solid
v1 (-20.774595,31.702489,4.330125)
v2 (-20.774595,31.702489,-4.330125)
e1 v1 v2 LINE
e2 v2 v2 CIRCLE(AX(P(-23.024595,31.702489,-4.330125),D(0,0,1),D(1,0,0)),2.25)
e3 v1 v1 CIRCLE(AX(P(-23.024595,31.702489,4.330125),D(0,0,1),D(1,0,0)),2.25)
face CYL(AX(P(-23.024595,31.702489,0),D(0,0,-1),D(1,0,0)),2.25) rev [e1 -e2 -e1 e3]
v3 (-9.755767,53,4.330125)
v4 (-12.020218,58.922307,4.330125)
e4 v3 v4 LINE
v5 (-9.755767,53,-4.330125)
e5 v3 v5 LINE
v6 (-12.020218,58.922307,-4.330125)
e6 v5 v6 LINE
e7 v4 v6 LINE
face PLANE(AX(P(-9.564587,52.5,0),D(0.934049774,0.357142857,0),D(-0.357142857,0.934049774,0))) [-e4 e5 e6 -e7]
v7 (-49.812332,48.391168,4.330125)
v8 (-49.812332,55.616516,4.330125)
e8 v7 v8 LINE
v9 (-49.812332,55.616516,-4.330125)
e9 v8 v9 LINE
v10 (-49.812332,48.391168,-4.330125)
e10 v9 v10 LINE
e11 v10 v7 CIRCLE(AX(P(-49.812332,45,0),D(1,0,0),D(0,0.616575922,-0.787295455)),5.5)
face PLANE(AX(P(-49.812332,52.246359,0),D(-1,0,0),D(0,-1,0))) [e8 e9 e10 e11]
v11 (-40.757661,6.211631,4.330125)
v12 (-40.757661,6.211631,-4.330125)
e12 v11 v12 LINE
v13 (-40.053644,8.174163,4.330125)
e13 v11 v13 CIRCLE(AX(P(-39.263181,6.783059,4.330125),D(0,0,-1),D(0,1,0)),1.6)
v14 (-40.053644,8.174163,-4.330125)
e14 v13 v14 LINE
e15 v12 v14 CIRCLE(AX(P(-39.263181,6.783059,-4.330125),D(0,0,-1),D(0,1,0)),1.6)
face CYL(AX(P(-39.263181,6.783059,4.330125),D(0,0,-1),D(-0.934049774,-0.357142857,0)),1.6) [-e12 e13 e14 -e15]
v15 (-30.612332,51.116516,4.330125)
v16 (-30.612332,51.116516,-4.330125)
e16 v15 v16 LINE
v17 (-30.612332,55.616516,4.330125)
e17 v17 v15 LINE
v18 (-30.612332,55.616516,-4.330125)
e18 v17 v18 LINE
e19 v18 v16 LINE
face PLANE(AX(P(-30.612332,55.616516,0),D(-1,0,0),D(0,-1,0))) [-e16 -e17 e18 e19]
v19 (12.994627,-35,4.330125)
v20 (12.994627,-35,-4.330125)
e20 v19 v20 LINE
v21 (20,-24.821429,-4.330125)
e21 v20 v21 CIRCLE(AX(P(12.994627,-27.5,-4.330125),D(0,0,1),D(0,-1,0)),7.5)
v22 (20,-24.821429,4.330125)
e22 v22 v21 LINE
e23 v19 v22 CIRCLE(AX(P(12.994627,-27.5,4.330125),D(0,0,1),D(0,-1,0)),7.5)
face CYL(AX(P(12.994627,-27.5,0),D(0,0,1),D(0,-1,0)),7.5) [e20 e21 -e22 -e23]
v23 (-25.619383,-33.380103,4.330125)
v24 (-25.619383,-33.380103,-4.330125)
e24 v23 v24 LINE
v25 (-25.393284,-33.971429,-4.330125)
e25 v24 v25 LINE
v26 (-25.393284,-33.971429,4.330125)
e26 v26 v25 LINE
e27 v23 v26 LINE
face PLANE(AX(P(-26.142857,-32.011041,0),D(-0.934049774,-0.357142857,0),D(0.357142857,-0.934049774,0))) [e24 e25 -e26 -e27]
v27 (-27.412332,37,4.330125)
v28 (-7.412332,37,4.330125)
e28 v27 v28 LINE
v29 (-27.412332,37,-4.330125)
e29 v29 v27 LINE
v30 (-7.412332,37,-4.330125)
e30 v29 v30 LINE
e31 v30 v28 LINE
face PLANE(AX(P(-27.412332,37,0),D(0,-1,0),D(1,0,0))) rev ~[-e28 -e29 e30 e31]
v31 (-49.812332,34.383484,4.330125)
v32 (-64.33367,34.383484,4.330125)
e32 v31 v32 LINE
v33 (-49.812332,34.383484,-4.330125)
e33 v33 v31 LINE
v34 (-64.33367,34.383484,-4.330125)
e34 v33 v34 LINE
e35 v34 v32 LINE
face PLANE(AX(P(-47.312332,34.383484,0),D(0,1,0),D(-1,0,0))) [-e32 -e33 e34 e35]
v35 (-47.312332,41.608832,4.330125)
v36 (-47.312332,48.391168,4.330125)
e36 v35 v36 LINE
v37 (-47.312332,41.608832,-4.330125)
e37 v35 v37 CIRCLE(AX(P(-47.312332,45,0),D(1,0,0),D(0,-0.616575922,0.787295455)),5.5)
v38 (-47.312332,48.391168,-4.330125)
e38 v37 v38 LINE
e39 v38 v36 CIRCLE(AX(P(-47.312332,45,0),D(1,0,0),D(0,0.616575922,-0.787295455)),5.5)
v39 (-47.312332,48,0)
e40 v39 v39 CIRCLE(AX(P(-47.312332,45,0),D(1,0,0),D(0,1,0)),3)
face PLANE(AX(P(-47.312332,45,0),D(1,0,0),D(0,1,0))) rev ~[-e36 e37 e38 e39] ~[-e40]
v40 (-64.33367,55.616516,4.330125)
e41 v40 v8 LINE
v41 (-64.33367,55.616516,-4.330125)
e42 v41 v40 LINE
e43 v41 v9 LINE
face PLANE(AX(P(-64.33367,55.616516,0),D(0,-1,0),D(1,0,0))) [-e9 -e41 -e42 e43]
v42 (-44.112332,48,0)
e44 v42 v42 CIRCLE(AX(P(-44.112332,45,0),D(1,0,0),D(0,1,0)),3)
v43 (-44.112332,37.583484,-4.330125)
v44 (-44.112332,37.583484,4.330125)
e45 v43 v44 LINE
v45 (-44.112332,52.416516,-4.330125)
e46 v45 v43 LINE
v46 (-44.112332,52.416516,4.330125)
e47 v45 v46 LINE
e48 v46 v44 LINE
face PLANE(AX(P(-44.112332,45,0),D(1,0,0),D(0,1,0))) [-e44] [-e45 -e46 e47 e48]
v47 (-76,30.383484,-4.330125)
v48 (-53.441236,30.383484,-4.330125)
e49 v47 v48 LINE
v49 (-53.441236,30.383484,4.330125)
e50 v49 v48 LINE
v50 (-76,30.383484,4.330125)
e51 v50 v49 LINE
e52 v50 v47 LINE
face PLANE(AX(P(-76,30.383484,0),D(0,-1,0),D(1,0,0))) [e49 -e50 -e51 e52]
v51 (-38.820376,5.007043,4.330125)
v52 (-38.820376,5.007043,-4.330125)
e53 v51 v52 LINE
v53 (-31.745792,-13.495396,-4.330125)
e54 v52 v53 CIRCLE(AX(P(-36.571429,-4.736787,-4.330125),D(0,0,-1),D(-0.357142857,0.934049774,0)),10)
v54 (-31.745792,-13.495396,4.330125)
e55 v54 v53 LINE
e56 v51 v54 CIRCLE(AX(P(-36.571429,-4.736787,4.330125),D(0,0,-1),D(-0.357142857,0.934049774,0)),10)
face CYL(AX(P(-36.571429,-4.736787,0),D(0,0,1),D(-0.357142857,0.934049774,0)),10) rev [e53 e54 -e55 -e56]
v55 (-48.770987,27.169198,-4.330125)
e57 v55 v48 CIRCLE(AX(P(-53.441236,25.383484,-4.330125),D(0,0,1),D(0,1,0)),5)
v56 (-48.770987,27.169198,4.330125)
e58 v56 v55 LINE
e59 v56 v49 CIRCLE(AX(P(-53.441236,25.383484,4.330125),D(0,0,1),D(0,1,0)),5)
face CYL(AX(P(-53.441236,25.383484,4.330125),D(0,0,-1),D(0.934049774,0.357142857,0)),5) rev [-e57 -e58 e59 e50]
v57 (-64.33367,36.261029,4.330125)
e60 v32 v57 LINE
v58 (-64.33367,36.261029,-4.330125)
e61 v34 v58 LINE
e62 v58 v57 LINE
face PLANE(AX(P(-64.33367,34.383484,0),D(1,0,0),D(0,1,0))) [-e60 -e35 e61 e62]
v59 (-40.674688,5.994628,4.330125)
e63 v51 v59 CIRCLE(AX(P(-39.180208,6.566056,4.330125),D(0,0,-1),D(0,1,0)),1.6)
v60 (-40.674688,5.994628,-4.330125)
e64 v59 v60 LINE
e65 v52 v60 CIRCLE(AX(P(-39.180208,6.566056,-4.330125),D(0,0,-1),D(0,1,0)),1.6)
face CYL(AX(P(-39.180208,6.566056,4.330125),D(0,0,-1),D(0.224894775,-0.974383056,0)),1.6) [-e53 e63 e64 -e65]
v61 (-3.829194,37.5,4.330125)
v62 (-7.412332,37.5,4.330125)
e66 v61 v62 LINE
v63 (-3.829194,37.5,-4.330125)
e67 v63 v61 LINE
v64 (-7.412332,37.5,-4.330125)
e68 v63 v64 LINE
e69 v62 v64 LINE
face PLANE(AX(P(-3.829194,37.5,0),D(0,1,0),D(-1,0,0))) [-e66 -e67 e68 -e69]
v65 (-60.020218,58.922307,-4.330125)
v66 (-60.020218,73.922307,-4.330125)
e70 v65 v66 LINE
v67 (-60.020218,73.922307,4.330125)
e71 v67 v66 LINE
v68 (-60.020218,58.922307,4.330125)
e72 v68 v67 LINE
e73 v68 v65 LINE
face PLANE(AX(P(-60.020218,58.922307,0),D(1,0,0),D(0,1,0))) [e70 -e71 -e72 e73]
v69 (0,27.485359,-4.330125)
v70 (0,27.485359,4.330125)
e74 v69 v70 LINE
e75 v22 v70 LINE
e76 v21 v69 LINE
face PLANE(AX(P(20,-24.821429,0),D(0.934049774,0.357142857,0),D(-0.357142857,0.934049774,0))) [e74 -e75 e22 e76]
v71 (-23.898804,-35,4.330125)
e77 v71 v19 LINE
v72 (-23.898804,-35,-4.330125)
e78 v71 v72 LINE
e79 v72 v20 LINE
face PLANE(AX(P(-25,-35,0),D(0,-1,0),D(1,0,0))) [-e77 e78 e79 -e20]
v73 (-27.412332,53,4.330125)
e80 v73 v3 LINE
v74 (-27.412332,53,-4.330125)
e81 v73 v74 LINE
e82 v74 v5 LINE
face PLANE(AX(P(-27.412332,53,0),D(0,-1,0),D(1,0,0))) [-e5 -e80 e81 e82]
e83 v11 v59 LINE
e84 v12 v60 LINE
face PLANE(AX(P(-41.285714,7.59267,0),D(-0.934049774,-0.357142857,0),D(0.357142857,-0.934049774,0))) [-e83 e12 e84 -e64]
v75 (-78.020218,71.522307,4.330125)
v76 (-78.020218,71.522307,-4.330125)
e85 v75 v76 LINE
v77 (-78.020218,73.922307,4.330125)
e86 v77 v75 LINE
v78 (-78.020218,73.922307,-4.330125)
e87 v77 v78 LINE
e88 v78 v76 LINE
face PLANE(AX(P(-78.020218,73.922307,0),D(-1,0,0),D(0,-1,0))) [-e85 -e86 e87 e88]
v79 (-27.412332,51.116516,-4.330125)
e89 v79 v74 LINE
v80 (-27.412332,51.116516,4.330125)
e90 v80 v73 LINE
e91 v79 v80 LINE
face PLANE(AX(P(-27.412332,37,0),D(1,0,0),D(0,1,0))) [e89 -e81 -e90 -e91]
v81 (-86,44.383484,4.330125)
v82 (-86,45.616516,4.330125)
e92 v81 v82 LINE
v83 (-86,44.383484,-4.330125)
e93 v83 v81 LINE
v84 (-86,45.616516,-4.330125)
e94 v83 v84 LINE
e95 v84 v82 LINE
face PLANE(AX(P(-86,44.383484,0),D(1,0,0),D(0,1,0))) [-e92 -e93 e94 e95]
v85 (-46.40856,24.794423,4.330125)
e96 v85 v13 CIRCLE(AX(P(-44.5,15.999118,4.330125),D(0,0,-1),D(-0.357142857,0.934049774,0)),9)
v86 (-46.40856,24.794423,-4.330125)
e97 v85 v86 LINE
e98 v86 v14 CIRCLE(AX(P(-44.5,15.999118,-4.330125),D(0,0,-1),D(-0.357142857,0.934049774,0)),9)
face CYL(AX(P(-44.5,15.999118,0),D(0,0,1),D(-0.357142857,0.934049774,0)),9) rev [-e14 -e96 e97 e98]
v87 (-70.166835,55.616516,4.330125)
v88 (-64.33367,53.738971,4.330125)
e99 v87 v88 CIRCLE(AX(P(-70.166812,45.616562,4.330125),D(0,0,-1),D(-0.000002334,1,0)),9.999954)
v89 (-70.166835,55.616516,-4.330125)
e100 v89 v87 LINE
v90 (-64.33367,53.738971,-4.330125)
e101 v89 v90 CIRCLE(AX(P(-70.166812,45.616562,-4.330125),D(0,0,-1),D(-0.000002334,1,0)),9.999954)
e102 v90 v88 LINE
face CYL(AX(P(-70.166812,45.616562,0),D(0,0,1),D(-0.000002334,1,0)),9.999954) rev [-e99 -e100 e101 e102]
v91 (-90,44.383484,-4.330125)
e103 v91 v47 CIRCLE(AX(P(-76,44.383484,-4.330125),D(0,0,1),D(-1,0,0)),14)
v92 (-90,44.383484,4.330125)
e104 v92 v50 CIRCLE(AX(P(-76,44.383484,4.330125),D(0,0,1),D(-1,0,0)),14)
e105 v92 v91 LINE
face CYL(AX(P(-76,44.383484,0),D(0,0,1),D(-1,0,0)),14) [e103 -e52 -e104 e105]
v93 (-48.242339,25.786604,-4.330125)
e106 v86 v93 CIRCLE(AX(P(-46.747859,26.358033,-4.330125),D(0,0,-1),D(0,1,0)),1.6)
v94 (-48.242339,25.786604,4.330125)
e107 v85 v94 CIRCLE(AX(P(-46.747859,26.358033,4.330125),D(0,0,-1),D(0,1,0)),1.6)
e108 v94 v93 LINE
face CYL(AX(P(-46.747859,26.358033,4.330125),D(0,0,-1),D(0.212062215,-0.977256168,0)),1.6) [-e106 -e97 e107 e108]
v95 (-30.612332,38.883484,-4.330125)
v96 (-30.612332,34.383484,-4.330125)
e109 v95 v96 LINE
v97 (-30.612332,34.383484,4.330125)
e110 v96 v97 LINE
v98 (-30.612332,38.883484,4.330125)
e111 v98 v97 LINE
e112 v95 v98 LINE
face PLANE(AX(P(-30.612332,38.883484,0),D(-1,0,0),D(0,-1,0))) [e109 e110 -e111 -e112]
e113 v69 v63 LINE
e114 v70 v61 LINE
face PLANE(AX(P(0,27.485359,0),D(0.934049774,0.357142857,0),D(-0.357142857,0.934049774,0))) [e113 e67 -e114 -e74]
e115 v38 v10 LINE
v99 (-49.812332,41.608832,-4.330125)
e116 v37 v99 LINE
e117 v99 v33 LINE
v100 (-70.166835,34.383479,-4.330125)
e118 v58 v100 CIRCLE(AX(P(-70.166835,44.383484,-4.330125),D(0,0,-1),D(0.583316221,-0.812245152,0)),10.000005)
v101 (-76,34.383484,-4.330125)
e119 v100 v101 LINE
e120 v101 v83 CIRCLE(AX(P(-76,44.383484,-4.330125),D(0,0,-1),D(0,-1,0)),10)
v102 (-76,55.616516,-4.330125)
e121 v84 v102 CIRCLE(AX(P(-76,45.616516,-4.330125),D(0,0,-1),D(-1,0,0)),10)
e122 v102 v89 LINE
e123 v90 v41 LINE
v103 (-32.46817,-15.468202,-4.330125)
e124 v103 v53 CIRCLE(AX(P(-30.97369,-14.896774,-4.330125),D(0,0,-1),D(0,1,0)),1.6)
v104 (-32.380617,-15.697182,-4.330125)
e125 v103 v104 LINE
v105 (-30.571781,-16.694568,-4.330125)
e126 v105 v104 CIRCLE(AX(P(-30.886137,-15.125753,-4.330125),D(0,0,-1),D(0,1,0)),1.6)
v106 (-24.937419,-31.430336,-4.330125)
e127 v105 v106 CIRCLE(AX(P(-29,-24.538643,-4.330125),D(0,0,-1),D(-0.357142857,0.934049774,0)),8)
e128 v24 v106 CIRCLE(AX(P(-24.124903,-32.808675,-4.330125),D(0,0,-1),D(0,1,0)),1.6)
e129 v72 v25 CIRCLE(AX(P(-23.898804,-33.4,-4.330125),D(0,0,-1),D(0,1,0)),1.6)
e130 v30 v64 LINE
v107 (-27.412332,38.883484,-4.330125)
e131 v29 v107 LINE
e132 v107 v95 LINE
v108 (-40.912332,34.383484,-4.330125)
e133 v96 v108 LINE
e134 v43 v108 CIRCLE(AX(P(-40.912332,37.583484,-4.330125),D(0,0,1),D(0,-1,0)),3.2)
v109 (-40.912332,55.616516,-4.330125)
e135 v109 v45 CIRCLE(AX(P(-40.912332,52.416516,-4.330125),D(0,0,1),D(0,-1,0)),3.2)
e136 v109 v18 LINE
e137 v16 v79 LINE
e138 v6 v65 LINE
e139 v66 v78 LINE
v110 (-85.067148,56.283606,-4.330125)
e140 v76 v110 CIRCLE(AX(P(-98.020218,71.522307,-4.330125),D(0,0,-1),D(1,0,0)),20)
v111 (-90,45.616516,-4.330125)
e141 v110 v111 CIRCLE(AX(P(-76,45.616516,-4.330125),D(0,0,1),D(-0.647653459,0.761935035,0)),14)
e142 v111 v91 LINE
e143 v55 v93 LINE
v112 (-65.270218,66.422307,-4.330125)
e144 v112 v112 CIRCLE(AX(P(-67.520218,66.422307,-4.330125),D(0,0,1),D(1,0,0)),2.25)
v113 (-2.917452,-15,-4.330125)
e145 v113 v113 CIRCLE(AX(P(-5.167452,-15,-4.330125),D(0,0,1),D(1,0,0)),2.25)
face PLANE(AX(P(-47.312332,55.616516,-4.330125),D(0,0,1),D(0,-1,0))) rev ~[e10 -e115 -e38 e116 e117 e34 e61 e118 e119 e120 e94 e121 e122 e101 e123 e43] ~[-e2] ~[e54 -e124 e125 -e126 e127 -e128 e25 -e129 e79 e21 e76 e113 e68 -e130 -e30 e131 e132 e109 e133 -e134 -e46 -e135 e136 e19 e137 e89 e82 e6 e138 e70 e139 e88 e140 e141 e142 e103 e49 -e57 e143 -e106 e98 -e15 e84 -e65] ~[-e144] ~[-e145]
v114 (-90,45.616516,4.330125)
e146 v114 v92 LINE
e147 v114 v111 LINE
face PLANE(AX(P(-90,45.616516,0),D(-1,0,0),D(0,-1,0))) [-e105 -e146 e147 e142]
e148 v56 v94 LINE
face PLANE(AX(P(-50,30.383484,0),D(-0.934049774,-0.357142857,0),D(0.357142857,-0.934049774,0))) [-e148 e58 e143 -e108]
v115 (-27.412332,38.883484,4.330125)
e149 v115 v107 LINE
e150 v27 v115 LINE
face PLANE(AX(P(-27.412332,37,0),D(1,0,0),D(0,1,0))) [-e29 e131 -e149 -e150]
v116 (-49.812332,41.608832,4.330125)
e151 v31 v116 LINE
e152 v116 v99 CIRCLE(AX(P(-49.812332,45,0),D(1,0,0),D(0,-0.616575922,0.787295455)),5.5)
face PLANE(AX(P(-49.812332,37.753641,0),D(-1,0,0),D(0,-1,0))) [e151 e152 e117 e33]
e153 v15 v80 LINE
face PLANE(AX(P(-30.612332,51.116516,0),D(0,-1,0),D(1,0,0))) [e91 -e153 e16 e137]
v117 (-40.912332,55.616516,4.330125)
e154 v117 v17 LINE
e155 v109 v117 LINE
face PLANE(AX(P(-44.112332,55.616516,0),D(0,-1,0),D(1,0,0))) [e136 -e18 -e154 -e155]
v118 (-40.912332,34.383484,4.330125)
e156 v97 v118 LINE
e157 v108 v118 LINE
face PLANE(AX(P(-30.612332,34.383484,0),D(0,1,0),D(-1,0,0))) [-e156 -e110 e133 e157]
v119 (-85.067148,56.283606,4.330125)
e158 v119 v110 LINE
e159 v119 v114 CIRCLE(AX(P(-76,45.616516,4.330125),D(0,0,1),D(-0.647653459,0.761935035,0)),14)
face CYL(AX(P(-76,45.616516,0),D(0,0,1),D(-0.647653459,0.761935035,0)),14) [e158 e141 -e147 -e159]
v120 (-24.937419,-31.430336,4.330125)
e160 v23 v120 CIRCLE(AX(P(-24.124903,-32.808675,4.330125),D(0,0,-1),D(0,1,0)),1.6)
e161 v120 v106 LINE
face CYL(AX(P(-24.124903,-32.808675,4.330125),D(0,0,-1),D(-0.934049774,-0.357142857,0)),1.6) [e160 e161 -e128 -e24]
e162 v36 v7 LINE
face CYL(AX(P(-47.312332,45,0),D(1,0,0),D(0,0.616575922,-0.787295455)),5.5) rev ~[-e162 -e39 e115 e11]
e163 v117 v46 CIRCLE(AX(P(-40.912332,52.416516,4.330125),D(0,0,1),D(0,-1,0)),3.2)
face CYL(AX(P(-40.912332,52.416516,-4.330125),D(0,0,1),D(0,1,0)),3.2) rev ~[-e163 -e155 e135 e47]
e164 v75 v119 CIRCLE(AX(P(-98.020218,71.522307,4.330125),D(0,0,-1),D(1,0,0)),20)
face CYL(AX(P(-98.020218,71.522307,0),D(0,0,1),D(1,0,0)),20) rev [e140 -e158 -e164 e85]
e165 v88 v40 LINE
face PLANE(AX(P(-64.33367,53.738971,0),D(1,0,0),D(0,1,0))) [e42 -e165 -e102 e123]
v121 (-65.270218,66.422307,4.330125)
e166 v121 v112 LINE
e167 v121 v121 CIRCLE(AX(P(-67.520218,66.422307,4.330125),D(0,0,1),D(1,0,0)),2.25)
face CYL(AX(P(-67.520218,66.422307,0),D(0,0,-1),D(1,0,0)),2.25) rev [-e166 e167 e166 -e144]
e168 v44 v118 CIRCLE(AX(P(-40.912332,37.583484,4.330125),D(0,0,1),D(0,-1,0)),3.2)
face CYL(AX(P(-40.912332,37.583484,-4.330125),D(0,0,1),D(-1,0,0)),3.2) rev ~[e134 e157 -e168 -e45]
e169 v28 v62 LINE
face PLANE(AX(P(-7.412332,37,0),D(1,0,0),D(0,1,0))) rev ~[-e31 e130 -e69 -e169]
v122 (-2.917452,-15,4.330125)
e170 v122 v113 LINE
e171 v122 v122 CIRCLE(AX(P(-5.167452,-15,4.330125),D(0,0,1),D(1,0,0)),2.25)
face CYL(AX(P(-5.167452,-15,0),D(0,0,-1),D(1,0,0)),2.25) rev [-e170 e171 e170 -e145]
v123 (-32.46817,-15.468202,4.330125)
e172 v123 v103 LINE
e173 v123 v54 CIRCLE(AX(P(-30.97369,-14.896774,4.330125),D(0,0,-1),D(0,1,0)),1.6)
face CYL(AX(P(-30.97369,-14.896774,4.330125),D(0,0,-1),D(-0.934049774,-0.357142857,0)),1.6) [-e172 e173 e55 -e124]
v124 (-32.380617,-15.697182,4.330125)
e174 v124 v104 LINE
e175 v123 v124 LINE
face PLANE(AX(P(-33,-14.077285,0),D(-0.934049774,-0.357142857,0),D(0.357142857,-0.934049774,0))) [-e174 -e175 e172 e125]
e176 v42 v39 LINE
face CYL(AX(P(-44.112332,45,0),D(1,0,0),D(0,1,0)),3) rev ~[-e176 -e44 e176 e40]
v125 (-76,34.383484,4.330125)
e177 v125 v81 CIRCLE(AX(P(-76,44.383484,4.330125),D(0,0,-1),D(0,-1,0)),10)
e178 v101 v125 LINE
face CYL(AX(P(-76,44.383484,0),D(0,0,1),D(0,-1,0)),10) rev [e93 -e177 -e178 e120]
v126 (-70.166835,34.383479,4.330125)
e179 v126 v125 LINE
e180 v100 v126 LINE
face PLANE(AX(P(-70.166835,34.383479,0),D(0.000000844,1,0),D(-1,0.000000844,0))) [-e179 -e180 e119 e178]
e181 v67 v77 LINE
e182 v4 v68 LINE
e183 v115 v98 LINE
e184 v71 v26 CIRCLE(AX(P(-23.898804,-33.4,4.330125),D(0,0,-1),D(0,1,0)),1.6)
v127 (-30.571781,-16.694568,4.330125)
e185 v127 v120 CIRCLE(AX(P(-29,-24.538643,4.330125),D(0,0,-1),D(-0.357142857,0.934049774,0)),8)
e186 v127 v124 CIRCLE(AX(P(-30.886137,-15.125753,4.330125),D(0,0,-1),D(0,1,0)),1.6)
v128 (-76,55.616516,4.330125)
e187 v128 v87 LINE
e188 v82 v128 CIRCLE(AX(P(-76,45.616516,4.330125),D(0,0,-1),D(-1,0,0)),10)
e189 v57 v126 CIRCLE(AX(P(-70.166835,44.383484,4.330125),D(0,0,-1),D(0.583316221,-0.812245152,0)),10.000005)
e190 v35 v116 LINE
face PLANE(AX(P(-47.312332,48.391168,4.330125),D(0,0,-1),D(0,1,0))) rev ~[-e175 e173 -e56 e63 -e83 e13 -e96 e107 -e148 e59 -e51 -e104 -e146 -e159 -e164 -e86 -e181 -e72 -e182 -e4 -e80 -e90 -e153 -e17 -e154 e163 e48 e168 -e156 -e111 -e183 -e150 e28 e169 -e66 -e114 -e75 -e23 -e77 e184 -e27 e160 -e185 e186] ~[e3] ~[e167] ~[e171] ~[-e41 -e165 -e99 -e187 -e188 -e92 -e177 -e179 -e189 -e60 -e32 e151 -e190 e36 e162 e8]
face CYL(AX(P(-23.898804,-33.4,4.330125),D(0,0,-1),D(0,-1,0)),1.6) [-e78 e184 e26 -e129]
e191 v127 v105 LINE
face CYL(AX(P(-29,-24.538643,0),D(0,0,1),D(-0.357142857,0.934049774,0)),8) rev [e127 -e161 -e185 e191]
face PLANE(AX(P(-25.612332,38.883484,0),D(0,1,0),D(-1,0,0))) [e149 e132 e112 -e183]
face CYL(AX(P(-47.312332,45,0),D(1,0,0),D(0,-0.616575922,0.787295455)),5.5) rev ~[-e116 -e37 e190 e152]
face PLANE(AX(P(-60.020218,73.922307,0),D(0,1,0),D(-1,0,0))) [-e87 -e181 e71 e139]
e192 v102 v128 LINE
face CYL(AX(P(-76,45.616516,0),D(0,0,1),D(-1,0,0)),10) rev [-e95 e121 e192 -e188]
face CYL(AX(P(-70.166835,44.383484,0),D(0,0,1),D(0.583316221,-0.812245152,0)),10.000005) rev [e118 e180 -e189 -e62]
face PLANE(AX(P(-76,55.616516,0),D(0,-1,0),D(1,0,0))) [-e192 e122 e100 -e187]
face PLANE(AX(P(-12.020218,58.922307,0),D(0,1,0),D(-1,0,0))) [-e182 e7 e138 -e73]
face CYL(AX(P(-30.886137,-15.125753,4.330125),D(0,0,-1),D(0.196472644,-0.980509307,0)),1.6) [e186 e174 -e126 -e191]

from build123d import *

# Parameters (mm, degrees)
F0_R     = 2.25
F1_DEPTH = 4.330125
F2_W     = 20
F2_H     = 16
F3_DEPTH = 12.5
F4_R     = 3.2
F5_W     = 6.4
F5_H     = 8.66025
F5_R     = 3
F6_DEPTH = 3.2
F8_DEPTH = 2.5
F9_R     = 1.6
F10_R    = 5


# Not quite as in the source:
# - ends of sketch curves that miss each other by under 0.0002 mm in the source are joined


with BuildPart() as f1:
    # F0 (on Top) → F1 (new body, symmetric)
    with BuildSketch(Plane.XY):
        with BuildLine():
            Line((20, -24.8214285714), (0, 27.4853587511))
            Line((0, 27.4853587511), (-3.829193786, 37.5))
            Line((-3.829193786, 37.5), (-12.6123318144, 37.5))
            Line((-12.6123318144, 37.5), (-25.6123318144, 37.5))
            Line((-25.6123318144, 37.5), (-25.6123318144, 38.8834841531))
            Line((-25.6123318144, 38.8834841531), (-30.6123318144, 38.8834841531))
            Line((-30.6123318144, 38.8834841531), (-30.6123318144, 34.3834841531))
            Line((-30.6123318144, 34.3834841531), (-44.1123318144, 34.3834841531))
            Line((-44.1123318144, 34.3834841531), (-44.1123318144, 41.8))
            Line((-44.1123318144, 41.8), (-47.3123318144, 41.8))
            Line((-47.3123318144, 41.8), (-47.3123318144, 34.3834841531))
            Line((-47.3123318144, 34.3834841531), (-64.3336698413, 34.3834841531))
            Line((-64.3336698413, 34.3834841531), (-64.3336698413, 36.2610286334))
            ThreePointArc((-64.3336698413, 36.2610286334), (-67.1028911134, 34.8644323695), (-70.1668349206, 34.3834792274))
            Line((-70.1668349206, 34.3834792274), (-76, 34.3834841531))
            ThreePointArc((-76, 34.3834841531), (-83.0710678119, 37.3124163412), (-86, 44.3834841531))
            Line((-86, 44.3834841531), (-86, 45.6165158469))
            ThreePointArc((-86, 45.6165158469), (-83.0710678119, 52.6875836588), (-76, 55.6165158469))
            Line((-76, 55.6165158469), (-70.1668349206, 55.6165158469))
            ThreePointArc((-70.1668349206, 55.6165158469), (-67.1028911134, 55.1355676305), (-64.3336698413, 53.7389713666))
            Line((-64.3336698413, 53.7389713666), (-64.3336698413, 55.6165158469))
            Line((-64.3336698413, 55.6165158469), (-47.3123318144, 55.6165158469))
            Line((-47.3123318144, 55.6165158469), (-47.3123318144, 48.2))
            Line((-47.3123318144, 48.2), (-44.1123318144, 48.2))
            Line((-44.1123318144, 48.2), (-44.1123318144, 55.6165158469))
            Line((-44.1123318144, 55.6165158469), (-30.6123318144, 55.6165158469))
            Line((-30.6123318144, 55.6165158469), (-30.6123318144, 51.1165158469))
            Line((-30.6123318144, 51.1165158469), (-25.6123318144, 51.1165158469))
            Line((-25.6123318144, 51.1165158469), (-25.6123318144, 52.5))
            Line((-25.6123318144, 52.5), (-12.6123318144, 52.5))
            Line((-12.6123318144, 52.5), (-9.5645871327, 52.5))
            Line((-9.5645871327, 52.5), (-12.0202176002, 58.9223070303))
            Line((-12.0202176002, 58.9223070303), (-60.0202176002, 58.9223070303))
            Line((-60.0202176002, 58.9223070303), (-60.0202176002, 73.9223070303))
            Line((-60.0202176002, 73.9223070303), (-78.0202176002, 73.9223070303))
            Line((-78.0202176002, 73.9223070303), (-78.0202176002, 71.5223070303))
            ThreePointArc((-78.0202176002, 71.5223070303), (-79.8672373555, 63.1277070855), (-85.0671484236, 56.2836063342))
            ThreePointArc((-85.0671484236, 56.2836063342), (-88.7070861713, 51.4927358083), (-90, 45.6165158469))
            Line((-90, 45.6165158469), (-90, 44.3834841531))
            ThreePointArc((-90, 44.3834841531), (-85.8994949366, 34.4839892165), (-76, 30.3834841531))
            Line((-76, 30.3834841531), (-50, 30.3834841531))
            Line((-50, 30.3834841531), (-47.7142857143, 24.405565602))
            ThreePointArc((-47.7142857143, 24.405565602), (-36.0935520375, 19.2134033537), (-41.2857142857, 7.5926696769))
            Line((-41.2857142857, 7.5926696769), (-40.1428571429, 4.6037104013))
            ThreePointArc((-40.1428571429, 4.6037104013), (-27.2309308353, -1.1653587634), (-33, -14.077285071))
            Line((-33, -14.077285071), (-31.8571428571, -17.0662443466))
            ThreePointArc((-31.8571428571, -17.0662443466), (-21.5276018111, -21.6814996784), (-26.1428571429, -32.0110407244))
            Line((-26.1428571429, -32.0110407244), (-25, -35))
            Line((-25, -35), (12.9946266979, -35))
            ThreePointArc((12.9946266979, -35), (19.1727852307, -31.7521003214), (20, -24.8214285714))
        make_face()
        with Locations((-5.1674522335, -15)):
            Circle(F0_R, mode=Mode.SUBTRACT)
        with Locations((-67.5202176002, 66.4223070303)):
            Circle(F0_R, mode=Mode.SUBTRACT)
        with Locations((-23.0245950907, 31.7024886808)):
            Circle(F0_R, mode=Mode.SUBTRACT)
    extrude(amount=F1_DEPTH, both=True)

    # F2 (on Top) → F3 (cut, symmetric)
    with BuildSketch(Plane.XY):
        with Locations((-17.4123318144, 45)):
            Rectangle(F2_W, F2_H)
    extrude(amount=F3_DEPTH, both=True, mode=Mode.SUBTRACT)

    # F4
    f4_edges = [f1.edges().sort_by_distance(p)[0] for p in [
        (-44.112332, 55.616516, 0),
        (-44.112332, 34.383484, 0),
    ]]
    fillet(f4_edges, radius=F4_R)

    # F5 (on face) → F6 (join)
    with BuildSketch(Plane.YZ.offset(-44.1123318144)):
        with Locations((45, 0)):
            Rectangle(F5_W, F5_H)
        with Locations((45, 0)):
            Circle(F5_R, mode=Mode.SUBTRACT)
    extrude(amount=-F6_DEPTH)

    # F7 (on face) → F8 (join)
    with BuildSketch(Plane(origin=(-47.3123318144, 0, 0), x_dir=(0, -1, 0), z_dir=(-1, 0, 0))):
        with BuildLine():
            Line((-48.3911675695, 4.330125), (-55.6165158469, 4.330125))
            Line((-55.6165158469, 4.330125), (-55.6165158469, -4.330125))
            Line((-55.6165158469, -4.330125), (-48.3911675695, -4.330125))
            ThreePointArc((-48.3911675695, -4.330125), (-50.5, 0), (-48.3911675695, 4.330125))
        make_face()
        with BuildLine():
            Line((-34.3834841531, -4.330125), (-34.3834841531, 4.330125))
            Line((-34.3834841531, 4.330125), (-41.6088324305, 4.330125))
            ThreePointArc((-41.6088324305, 4.330125), (-39.5, 0), (-41.6088324305, -4.330125))
            Line((-41.6088324305, -4.330125), (-34.3834841531, -4.330125))
        make_face()
    extrude(amount=F8_DEPTH)

    # F9
    f9_edges = [f1.edges().sort_by_distance(p)[0] for p in [
        (-25, -35, 0),
        (-26.142857, -32.011041, 0),
        (-31.857143, -17.066244, 0),
        (-33, -14.077285, 0),
        (-40.142857, 4.60371, 0),
        (-41.285714, 7.59267, 0),
        (-47.714286, 24.405566, 0),
    ]]
    fillet(f9_edges, radius=F9_R)

    # F10
    f10_edges = [f1.edges().sort_by_distance(p)[0] for p in [
        (-50, 30.383484, 0),
    ]]
    fillet(f10_edges, radius=F10_R)


solid = f1.part
